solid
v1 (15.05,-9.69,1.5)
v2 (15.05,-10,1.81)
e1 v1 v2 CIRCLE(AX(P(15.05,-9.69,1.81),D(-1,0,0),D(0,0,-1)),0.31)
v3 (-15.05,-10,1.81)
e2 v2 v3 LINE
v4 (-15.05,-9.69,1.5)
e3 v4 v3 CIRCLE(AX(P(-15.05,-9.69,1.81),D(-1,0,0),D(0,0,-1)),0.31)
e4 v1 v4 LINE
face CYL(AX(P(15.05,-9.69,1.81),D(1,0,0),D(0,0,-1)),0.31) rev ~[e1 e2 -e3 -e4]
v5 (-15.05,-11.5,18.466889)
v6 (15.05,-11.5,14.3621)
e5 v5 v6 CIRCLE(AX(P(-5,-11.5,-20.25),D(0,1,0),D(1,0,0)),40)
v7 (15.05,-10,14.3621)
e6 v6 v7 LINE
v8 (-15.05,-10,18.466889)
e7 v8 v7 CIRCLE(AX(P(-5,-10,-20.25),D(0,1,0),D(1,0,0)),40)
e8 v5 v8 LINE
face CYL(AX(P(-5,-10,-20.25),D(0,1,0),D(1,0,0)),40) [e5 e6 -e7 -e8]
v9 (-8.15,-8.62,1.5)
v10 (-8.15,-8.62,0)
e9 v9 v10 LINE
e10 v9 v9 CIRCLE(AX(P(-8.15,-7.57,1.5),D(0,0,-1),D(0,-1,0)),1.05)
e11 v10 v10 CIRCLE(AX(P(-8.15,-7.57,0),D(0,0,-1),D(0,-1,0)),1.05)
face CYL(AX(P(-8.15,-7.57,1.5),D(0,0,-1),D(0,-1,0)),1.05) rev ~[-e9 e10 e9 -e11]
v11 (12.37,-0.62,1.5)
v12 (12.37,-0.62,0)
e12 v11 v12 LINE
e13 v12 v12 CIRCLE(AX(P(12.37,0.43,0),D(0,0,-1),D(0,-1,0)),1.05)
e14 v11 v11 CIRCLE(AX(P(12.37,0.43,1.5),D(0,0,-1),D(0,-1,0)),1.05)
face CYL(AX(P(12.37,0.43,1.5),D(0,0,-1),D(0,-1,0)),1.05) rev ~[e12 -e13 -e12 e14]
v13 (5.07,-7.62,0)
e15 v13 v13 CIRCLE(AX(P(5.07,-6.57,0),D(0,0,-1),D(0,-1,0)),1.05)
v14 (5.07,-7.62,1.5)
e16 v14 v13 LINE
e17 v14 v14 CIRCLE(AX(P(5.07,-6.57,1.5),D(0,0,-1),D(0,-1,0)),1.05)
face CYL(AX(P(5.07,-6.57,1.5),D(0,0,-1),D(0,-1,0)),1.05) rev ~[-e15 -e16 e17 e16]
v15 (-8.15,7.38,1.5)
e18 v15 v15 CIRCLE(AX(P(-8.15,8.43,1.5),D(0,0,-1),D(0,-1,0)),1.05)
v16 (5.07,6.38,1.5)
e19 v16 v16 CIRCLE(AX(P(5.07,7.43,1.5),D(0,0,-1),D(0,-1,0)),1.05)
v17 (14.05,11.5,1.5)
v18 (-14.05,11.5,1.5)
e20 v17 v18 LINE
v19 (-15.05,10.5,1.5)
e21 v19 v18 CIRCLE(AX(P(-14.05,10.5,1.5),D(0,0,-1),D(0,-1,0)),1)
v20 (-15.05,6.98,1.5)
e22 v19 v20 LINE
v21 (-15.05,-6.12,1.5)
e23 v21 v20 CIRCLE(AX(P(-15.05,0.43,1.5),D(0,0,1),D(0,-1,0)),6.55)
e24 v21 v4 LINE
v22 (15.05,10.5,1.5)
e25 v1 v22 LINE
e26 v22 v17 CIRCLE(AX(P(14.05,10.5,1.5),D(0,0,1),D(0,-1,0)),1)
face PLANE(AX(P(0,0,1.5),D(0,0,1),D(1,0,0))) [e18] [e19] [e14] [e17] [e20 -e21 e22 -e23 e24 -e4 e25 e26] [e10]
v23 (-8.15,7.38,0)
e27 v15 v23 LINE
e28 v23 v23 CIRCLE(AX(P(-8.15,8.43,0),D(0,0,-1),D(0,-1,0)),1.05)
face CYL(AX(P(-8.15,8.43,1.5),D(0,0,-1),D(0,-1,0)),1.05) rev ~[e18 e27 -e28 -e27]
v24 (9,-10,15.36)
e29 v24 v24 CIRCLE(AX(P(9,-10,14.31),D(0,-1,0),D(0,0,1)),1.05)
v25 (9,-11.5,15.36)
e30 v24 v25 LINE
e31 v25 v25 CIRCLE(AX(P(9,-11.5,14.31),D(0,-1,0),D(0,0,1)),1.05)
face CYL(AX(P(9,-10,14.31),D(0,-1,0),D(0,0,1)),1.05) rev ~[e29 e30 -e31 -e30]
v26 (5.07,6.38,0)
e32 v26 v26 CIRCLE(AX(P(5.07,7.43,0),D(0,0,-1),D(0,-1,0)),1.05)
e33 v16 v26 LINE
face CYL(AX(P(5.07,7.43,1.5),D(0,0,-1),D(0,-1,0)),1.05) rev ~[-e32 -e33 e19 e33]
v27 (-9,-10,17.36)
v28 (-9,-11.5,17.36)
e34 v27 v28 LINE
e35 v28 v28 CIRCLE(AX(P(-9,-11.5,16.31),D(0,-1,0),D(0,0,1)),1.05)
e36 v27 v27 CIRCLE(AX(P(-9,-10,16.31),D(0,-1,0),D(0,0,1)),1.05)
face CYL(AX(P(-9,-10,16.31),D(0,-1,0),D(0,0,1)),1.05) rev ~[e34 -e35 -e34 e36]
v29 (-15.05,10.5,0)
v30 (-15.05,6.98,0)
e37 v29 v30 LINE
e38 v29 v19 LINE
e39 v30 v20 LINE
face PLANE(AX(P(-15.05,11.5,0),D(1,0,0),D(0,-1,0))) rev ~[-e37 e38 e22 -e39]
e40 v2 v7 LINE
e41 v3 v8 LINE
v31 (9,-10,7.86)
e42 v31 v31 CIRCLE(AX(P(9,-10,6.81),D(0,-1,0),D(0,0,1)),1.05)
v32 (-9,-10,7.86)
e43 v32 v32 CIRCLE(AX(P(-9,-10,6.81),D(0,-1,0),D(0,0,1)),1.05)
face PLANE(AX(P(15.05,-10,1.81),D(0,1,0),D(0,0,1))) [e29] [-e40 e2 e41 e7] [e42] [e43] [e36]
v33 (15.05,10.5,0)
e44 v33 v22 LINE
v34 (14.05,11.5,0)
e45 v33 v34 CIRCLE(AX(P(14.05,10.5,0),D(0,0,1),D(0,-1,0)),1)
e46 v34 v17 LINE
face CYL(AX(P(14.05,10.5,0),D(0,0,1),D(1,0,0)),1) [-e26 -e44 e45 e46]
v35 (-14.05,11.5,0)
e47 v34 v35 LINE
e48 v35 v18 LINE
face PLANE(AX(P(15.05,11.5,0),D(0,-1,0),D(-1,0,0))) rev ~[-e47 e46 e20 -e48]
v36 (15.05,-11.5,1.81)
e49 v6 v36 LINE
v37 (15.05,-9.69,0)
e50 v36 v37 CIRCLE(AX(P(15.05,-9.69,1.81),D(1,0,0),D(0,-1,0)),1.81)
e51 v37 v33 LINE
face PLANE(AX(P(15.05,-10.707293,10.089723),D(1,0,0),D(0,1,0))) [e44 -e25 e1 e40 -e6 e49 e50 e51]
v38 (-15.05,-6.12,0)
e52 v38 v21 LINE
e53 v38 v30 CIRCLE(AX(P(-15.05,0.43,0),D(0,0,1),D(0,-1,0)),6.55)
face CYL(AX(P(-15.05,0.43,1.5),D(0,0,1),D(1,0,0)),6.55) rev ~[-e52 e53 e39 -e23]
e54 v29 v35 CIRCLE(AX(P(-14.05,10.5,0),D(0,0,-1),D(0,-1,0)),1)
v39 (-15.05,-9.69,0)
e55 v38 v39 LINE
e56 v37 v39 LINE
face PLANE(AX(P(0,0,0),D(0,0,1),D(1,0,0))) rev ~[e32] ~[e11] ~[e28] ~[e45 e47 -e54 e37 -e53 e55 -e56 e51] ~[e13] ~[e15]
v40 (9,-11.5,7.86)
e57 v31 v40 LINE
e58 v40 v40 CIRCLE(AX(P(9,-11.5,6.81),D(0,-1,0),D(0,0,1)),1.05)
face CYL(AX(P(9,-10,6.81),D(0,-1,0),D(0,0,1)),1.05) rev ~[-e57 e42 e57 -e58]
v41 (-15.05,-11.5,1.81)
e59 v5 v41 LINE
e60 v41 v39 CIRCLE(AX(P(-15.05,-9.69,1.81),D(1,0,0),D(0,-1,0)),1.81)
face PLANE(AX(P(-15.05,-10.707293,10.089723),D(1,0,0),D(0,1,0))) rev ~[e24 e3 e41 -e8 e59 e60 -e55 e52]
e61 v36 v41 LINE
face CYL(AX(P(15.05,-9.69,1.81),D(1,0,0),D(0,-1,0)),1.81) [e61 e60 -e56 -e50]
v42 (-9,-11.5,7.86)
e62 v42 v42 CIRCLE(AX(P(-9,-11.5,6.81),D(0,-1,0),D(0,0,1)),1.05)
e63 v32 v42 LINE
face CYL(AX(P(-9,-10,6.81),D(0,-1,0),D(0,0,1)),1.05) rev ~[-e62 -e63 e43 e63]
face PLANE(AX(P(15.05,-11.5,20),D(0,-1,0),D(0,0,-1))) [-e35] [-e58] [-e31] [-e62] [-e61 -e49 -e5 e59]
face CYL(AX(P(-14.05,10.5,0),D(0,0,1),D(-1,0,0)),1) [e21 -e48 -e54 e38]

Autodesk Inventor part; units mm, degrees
ref_plane "YZ Plane" through (0, 0, 0) normal (1, 0, 0) x (0, 1, 0)
ref_plane "XZ Plane" through (0, 0, 0) normal (0, 1, 0) x (-1, 0, 0)
ref_plane "XY Plane" through (0, 0, 0) normal (0, 0, 1) x (1, 0, 0)
sketch "Sketch1" plane through (0, 0, 0) normal (0, 0, 1) x (1, 0, 0)
  line L0 (-15.05, -11.5) -> (15.05, -11.5)
  line L1 (15.05, -11.5) -> (15.05, 11.5)
  line L2 (15.05, 11.5) -> (-15.05, 11.5)
  line L3 (-15.05, 11.5) -> (-15.05, -11.5)
  line L4 (-15.05, -11.5) -> (15.05, 11.5) construction
  line L5 (15.05, -11.5) -> (-15.05, 11.5) construction
  point P0 (0, 0)
  dimension "d0" = 30.1
  dimension "d1" = 23
extrude "Plate1" add sketch "Sketch1" along normal blind 1.5
sketch "Sketch6" plane through (0, 0, 1.5) normal (0, 0, 1) x (1, 0, 0)
  circle A0 centre (-8.15, 8.43) radius 0.7835 projected
  circle A1 centre (-8.15, -7.57) radius 0.7835 projected
  circle A2 centre (5.07, 7.43) radius 0.7835 projected
  circle A3 centre (5.07, -6.57) radius 0.7835 projected
  circle A4 centre (12.37, 0.43) radius 0.7835 projected
  point P0 (0, 0)
hole "Hole2" at (-8.15, 8.43, 1.5) at (5.07, 7.43, 1.5) at (12.37, 0.43, 1.5) at (5.07, -6.57, 1.5) at (-8.15, -7.57, 1.5) direction (0, 0, -1) diameter 2.1 end through all
sketch "Sketch7" plane through (0, 0, 1.5) normal (0, 0, 1) x (1, 0, 0)
  circle A0 centre (-15.05, 0.43) radius 6.4 projected
  circle A1 centre (-15.05, 0.43) radius 6.55
  point P0 (0, 0)
  dimension "d42" = 0.15
extrude "Cut1" cut sketch "Sketch7" against normal blind 1.5 contours A0 | A1
sketch "Sketch8" plane through (15.05, -10, 0) normal (0, -1, 0) x (1, 0, 0)
  line L0 (-30.1, 0) -> (0, 0)
  line L1 (0, 0) -> (0, 20)
  line L2 (0, 20) -> (-30.1, 20)
  line L3 (-30.1, 20) -> (-30.1, 0)
edge flange "Flange2" height 20 angle 90 thickness 1.5 bend radius 0.31 thickness toward (0, -1, 0) relief tear relief width 1.5 relief depth 0.75 edges at (0, -11.5, 1.5) wall of the first edge with corners at (-15.05, -10, 0) (15.05, -10, 0) (15.05, -10, 20) (-15.05, -10, 20)
bend "Bend2"
corner "Corner2"
sketch "Sketch9" plane through (-15.05, -10, 20) normal (0, 1, 0) x (1, 0, 0)
  circle A0 centre (10.05, 40.25) radius 40 projected
  circle A1 centre (10.05, 40.25) radius 50
  point P0 (15.05, 20)
  dimension "d39" = 10
extrude "Cut2" cut sketch "Sketch9" against normal blind 1.5
fillet "Corner Round1" radius 1 2 edges at (15.05, 11.5, 0.75) (-15.05, 11.5, 0.75)
sketch "Sketch10" plane through (-15.05, -10, 1.81) normal (0, 1, 0) x (1, 0, 0)
  line L0 (30.1, 0) -> (0, 0) projected
  arc A0 (0, -16.6569) -> (30.1, -12.5521) centre (10.05, 22.06) ccw projected
  line L1 (15.05, 0) -> (15.05, -17.6263) construction
  point P0 (15.05, 1.81)
  point P1 (6.05, -5)
  point P2 (24.05, -5)
  point P3 (24.05, -12.5)
  point P4 (6.05, -14.5)
  dimension "d44" = 18
  dimension "d45" = 9.5
  dimension "d46" = 7.5
  dimension "d47" = 5
hole "Hole3" at (-9, -10, 6.81) at (9, -10, 6.81) at (9, -10, 14.31) at (-9, -10, 16.31) direction (0, -1, 0) diameter 2.1 end through all
equation "\"d27\" = Thickness"
equation "\"d40\" = Thickness"
equation "\"d2\" = Thickness"
equation "\"d29\" = BendReliefWidth"
equation "\"d30\" = BendReliefDepth"
equation "\"d31\" = MinimumRemnant"
equation "\"d32\" = TransitionRadius"
equation "\"d35\" = BendRadius"
equation "\"d36\" = CornerReliefSize"
equation "\"d37\" = GapSize"
equation "\"d38\" = JacobiRadiusSize"
equation "\"BendReliefWidth\" = Thickness"
equation "\"BendReliefDepth\" = 0.5 * Thickness"
equation "\"CornerReliefSize\" = 4 * Thickness"
equation "\"MinimumRemnant\" = 2 * Thickness"
equation "\"TransitionRadius\" = BendRadius"
equation "\"JacobiRadiusSize\" = BendRadius"
equation "\"GapSize\" = Thickness"
equation "\"Thickness\" = 1.5"
equation "\"BendRadius\" = 0.31"
properties part number "axis_2_bottom_L_frame(top)" material "Aluminum 6061-AHC"
